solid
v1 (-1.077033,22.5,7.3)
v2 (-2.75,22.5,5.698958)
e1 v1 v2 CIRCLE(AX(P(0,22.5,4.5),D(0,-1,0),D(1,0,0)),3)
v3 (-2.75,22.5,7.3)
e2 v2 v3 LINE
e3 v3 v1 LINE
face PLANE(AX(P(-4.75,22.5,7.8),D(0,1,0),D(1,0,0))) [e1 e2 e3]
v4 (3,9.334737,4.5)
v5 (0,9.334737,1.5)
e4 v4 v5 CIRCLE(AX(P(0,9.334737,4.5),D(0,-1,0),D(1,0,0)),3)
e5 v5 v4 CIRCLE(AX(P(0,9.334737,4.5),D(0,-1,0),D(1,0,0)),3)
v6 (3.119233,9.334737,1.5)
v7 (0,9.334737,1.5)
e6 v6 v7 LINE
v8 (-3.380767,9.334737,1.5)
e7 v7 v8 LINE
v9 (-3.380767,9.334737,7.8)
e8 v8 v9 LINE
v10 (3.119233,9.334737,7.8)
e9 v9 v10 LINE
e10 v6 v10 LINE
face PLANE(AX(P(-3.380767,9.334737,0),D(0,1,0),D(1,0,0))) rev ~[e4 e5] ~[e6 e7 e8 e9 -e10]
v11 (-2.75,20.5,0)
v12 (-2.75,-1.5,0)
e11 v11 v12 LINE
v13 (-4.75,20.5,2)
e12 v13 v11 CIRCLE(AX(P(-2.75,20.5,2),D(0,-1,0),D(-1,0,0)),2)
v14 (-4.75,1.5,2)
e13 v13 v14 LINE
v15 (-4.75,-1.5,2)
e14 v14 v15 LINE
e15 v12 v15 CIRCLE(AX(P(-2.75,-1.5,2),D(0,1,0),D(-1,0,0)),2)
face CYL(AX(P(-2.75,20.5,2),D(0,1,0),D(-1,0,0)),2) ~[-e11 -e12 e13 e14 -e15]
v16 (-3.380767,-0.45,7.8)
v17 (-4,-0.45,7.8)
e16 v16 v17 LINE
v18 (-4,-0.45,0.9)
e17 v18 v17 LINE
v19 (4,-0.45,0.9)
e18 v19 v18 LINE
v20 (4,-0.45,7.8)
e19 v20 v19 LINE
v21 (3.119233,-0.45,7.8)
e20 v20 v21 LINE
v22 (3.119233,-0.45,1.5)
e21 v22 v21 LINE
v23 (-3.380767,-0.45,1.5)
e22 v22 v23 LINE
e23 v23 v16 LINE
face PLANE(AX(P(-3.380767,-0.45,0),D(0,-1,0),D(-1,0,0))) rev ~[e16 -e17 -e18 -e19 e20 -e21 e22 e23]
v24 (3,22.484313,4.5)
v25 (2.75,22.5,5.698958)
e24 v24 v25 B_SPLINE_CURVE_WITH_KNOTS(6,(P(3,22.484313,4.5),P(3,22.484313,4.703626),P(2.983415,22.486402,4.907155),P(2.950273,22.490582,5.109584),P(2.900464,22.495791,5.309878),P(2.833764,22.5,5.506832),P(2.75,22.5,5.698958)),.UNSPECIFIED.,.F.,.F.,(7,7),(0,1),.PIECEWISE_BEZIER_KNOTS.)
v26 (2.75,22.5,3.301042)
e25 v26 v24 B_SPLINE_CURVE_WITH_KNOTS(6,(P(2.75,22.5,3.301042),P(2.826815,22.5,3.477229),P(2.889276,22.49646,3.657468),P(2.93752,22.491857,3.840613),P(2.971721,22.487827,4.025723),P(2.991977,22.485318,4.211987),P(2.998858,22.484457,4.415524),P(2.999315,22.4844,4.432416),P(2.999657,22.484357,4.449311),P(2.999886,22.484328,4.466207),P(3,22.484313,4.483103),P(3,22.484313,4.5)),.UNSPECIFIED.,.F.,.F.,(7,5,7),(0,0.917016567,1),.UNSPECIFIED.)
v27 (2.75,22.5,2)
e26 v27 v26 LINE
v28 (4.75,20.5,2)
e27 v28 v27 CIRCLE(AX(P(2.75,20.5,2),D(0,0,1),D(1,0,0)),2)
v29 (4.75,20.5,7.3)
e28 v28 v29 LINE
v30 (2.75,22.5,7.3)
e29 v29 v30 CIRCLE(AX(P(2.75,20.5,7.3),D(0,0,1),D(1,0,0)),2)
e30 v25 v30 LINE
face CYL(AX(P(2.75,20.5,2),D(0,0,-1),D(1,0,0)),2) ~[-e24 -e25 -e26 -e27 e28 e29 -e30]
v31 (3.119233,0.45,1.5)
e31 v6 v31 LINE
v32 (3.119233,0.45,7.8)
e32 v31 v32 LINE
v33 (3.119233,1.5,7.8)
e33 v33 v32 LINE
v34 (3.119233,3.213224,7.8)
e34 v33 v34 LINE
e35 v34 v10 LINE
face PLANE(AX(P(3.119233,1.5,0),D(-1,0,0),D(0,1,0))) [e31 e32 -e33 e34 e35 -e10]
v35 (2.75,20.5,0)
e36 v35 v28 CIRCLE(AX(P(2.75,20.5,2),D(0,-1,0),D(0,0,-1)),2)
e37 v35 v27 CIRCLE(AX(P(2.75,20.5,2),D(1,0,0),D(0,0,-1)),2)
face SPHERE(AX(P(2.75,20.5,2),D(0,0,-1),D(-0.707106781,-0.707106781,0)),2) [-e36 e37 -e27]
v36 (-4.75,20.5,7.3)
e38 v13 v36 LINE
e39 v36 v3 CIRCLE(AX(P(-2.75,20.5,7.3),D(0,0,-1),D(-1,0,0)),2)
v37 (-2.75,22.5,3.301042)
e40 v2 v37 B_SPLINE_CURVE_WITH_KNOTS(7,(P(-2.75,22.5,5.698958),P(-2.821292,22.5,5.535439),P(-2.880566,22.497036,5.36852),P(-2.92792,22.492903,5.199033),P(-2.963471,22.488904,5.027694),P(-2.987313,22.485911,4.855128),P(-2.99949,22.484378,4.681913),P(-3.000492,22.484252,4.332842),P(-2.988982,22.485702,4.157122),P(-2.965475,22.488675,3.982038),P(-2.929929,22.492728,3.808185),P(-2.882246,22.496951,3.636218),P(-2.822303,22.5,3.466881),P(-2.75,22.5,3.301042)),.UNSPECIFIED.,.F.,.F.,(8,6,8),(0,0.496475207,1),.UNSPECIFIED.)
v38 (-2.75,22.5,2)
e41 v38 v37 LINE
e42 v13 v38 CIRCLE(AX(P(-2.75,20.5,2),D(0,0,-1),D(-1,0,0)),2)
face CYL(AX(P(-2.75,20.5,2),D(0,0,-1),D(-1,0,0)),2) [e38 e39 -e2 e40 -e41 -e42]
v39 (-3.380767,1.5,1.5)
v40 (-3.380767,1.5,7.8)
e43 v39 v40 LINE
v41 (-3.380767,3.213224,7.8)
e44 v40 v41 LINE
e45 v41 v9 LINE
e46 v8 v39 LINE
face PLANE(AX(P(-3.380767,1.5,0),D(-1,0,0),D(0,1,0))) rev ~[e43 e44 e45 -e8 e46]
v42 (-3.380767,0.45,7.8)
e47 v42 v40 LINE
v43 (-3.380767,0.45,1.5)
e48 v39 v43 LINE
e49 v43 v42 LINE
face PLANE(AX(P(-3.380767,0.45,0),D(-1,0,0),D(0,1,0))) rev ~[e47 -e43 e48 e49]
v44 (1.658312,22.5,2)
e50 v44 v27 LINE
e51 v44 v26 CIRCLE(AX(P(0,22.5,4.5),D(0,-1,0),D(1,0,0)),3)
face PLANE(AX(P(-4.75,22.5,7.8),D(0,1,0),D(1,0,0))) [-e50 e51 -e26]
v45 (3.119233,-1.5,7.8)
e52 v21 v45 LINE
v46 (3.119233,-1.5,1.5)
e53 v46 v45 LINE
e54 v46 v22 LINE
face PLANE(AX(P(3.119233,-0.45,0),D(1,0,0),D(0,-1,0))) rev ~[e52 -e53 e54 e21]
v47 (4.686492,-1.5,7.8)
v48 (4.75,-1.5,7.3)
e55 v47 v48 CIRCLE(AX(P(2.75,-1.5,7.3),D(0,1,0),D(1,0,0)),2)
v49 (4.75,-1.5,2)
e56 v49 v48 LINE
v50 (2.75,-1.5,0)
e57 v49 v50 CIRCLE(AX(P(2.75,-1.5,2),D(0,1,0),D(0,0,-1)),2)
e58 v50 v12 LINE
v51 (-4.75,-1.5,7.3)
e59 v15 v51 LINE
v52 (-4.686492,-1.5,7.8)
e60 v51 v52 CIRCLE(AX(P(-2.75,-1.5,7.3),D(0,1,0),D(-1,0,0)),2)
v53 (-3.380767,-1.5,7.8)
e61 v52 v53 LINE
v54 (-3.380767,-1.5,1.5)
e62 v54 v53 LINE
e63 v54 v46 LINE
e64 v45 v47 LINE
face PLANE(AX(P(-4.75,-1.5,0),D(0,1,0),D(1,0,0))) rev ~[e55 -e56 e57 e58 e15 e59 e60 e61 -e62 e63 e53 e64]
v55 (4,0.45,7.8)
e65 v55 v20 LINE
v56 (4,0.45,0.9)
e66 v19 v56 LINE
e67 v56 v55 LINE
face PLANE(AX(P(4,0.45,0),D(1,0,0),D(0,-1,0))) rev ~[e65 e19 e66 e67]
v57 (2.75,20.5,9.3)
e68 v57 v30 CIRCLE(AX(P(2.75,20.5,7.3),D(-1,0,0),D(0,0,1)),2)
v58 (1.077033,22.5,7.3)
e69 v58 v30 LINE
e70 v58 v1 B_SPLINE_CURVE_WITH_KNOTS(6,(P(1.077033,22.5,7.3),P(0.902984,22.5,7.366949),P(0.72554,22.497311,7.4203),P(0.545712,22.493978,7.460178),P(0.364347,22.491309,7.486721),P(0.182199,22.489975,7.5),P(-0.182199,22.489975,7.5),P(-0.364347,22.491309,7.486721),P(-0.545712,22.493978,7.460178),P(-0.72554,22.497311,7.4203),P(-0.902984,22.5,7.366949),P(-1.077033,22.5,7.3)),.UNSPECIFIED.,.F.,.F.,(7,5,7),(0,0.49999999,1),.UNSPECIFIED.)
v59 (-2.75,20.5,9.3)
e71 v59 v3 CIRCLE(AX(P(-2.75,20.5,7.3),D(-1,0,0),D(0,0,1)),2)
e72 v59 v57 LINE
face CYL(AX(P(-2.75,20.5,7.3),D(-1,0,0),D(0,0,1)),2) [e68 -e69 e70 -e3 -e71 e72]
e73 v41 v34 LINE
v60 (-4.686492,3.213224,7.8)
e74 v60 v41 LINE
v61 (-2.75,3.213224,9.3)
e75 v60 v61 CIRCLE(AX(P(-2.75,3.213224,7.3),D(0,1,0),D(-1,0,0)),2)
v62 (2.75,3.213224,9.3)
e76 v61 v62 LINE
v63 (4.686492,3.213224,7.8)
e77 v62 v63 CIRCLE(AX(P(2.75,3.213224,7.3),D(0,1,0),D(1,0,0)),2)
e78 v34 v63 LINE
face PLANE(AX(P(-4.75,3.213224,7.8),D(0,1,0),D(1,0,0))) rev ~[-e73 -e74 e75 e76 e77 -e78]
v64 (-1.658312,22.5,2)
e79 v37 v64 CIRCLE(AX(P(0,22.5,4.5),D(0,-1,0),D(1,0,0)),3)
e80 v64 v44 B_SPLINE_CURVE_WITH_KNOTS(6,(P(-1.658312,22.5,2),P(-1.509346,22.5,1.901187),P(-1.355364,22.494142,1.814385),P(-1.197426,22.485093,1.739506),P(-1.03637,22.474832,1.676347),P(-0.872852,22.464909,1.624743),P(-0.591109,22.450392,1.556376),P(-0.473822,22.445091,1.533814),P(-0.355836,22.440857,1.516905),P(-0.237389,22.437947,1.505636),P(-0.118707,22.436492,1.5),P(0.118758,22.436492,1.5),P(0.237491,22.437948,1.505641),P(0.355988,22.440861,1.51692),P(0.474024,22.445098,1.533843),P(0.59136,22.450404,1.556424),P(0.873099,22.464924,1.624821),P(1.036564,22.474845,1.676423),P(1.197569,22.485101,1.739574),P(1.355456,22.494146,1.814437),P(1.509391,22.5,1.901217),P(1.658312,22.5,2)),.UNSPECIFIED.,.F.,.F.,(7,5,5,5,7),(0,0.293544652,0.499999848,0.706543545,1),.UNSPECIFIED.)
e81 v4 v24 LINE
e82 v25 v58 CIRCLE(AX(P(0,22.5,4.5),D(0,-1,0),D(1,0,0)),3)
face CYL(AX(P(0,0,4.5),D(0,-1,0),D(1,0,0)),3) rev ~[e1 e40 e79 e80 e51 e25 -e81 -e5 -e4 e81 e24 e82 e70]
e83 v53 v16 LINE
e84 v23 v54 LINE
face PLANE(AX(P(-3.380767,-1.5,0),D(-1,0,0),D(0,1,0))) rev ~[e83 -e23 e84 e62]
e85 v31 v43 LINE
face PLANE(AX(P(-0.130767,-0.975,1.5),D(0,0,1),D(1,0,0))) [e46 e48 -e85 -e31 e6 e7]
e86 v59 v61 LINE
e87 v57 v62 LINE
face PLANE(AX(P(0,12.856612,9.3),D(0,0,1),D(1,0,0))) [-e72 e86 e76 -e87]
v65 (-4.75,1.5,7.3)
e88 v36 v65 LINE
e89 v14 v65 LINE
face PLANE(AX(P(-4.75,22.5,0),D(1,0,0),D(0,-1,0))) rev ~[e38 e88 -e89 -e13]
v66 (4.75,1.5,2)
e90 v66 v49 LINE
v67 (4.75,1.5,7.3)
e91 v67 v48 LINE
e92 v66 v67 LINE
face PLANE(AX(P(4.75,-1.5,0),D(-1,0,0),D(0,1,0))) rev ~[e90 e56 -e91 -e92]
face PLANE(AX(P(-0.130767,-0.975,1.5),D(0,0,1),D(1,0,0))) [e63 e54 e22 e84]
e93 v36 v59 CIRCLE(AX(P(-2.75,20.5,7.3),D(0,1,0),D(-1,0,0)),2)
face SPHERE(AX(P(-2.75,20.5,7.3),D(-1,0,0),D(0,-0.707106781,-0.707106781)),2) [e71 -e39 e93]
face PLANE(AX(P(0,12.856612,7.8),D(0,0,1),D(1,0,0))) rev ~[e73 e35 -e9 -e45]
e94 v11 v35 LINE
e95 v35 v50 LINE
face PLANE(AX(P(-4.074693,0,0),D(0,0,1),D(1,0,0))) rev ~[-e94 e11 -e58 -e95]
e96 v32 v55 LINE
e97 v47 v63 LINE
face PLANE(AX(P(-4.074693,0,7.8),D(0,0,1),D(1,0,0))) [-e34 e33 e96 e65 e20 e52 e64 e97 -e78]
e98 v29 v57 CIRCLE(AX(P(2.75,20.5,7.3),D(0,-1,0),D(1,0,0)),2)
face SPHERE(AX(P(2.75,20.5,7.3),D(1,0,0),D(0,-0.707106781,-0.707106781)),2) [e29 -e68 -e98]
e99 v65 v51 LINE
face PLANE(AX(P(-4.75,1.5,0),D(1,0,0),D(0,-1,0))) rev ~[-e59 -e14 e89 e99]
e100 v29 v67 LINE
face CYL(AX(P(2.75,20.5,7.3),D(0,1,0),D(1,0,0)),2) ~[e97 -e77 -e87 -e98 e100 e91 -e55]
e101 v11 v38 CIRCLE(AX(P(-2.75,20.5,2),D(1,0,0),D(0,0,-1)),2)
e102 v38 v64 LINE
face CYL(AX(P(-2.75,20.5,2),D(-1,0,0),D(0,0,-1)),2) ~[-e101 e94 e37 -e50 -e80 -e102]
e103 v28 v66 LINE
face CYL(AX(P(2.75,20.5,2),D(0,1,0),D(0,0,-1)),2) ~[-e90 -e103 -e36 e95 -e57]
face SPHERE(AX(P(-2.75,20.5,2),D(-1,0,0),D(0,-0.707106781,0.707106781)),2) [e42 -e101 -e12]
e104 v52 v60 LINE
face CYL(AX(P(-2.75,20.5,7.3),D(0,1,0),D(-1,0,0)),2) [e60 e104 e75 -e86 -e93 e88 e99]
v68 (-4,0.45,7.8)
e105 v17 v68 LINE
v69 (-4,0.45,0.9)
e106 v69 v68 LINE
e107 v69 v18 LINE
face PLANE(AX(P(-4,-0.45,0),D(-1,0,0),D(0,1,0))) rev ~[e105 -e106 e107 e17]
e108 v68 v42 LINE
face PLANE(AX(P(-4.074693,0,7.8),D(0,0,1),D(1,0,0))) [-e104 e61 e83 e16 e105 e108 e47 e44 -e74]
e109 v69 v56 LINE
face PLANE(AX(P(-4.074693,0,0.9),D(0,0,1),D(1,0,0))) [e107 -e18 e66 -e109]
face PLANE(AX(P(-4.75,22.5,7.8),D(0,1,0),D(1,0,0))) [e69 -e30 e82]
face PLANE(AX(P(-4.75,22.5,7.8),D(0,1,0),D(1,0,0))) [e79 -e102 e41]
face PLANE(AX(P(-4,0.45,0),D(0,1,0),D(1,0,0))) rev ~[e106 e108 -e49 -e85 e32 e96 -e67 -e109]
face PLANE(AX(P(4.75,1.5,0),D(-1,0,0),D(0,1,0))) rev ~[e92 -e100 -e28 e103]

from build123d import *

# Parameters (mm, degrees)
F0_W         = 1.3692331631
F0_H         = 7.834737435
F0_W_2       = 6.5
F0_H_2       = 0.9
F0_W_3       = 0.6192331631
F0_H_3       = 1.05
F0_H_4       = 13.165262565
F0_W_4       = 0.8807668369
F0_W_5       = 1.6307668369
F1_DEPTH     = 0.9
F2_DEPTH     = 1.5
F3_DEPTH     = 7.8
F5_W         = 9.5
F5_H         = 19.2867757659
F6_DEPTH     = 1.5
F7_R         = 3
F8_DEPTH     = 22.501
F9_T1_DEPTH  = 5.3
F9_T3_DEPTH  = 5.5
F9_T5_DEPTH  = 22.2867757659
F9_T7_DEPTH  = 27
F9_S11_W     = 2
F9_S11_H     = 2
F9_T12_DEPTH = 2
F9_S17_W     = 2
F9_S17_H     = 2
F9_T18_DEPTH = 2
F9_S23_W     = 2
F9_S23_H     = 2
F9_T24_DEPTH = 2
F9_S29_W     = 2
F9_S29_H     = 2
F9_T30_DEPTH = 2


# Not quite as in the source:
# - a fillet or chamfer that OpenCascade refuses, or shapes differently, is made with other operations: its cross-section is extruded or revolved along the edge and cut away or added
# - a feature names something its author has since deleted; it is built from what else it names


with BuildPart() as f1:
    # F0 (on Top) → F1 (new body)
    with BuildSketch(Plane.XY):
        Polygon((-4.75, 1.5), (-4.75, -1.5), (-3.3807668369, -1.5), (-3.3807668369, -0.45), (-4, -0.45), (-4, 0.45), (-3.3807668369, 0.45), (-3.3807668369, 1.5), align=None)
        Polygon((-3.3807668369, -0.45), (-3.3807668369, -1.5), (-3.1192331631, -1.5), (3.1192331631, -1.5), (3.1192331631, -0.45), align=None)
        with Locations((-4.0653834185, 5.4173687175)):
            Rectangle(F0_W, F0_H)
        with Locations((-0.1307668369, 0)):
            Rectangle(F0_W_2, F0_H_2)
        with Locations((-3.6903834185, 0)):
            Rectangle(F0_W_3, F0_H_2)
        with Locations((-0.1307668369, 5.4173687175)):
            Rectangle(F0_W_2, F0_H)
        with Locations((-0.1307668369, 0.975)):
            Rectangle(F0_W_2, F0_H_3)
        with Locations((-4.0653834185, 15.9173687175)):
            Rectangle(F0_W, F0_H_4)
        Polygon((3.1192331631, -0.45), (3.1192331631, -1.5), (3.3807668369, -1.5), (4.75, -1.5), (4.75, 1.5), (3.1192331631, 1.5), (3.1192331631, 0.45), (4, 0.45), (4, -0.45), align=None)
        with Locations((3.5596165815, 0)):
            Rectangle(F0_W_4, F0_H_2)
        with Locations((3.9346165815, 5.4173687175)):
            Rectangle(F0_W_5, F0_H)
        with Locations((-0.1307668369, 15.9173687175)):
            Rectangle(F0_W_2, F0_H_4)
        with Locations((3.9346165815, 15.9173687175)):
            Rectangle(F0_W_5, F0_H_4)
    extrude(amount=F1_DEPTH)

    # F0 (on Top) → F2 (join)
    with BuildSketch(Plane.XY):
        Polygon((-3.3807668369, -0.45), (-3.3807668369, -1.5), (-3.1192331631, -1.5), (3.1192331631, -1.5), (3.1192331631, -0.45), align=None)
        Polygon((3.1192331631, -0.45), (3.1192331631, -1.5), (3.3807668369, -1.5), (4.75, -1.5), (4.75, 1.5), (3.1192331631, 1.5), (3.1192331631, 0.45), (4, 0.45), (4, -0.45), align=None)
        Polygon((-4.75, 1.5), (-4.75, -1.5), (-3.3807668369, -1.5), (-3.3807668369, -0.45), (-4, -0.45), (-4, 0.45), (-3.3807668369, 0.45), (-3.3807668369, 1.5), align=None)
        with Locations((-0.1307668369, 0.975)):
            Rectangle(F0_W_2, F0_H_3)
        with Locations((-4.0653834185, 5.4173687175)):
            Rectangle(F0_W, F0_H)
        with Locations((3.9346165815, 5.4173687175)):
            Rectangle(F0_W_5, F0_H)
        with Locations((-0.1307668369, 5.4173687175)):
            Rectangle(F0_W_2, F0_H)
        with Locations((-4.0653834185, 15.9173687175)):
            Rectangle(F0_W, F0_H_4)
        with Locations((-0.1307668369, 15.9173687175)):
            Rectangle(F0_W_2, F0_H_4)
        with Locations((3.9346165815, 15.9173687175)):
            Rectangle(F0_W_5, F0_H_4)
    extrude(amount=F2_DEPTH)

    # F0 (on Top) → F3 (join)
    with BuildSketch(Plane.XY):
        Polygon((-4.75, 1.5), (-4.75, -1.5), (-3.3807668369, -1.5), (-3.3807668369, -0.45), (-4, -0.45), (-4, 0.45), (-3.3807668369, 0.45), (-3.3807668369, 1.5), align=None)
        Polygon((3.1192331631, -0.45), (3.1192331631, -1.5), (3.3807668369, -1.5), (4.75, -1.5), (4.75, 1.5), (3.1192331631, 1.5), (3.1192331631, 0.45), (4, 0.45), (4, -0.45), align=None)
        with Locations((-4.0653834185, 5.4173687175)):
            Rectangle(F0_W, F0_H)
        with Locations((3.9346165815, 5.4173687175)):
            Rectangle(F0_W_5, F0_H)
        with Locations((-4.0653834185, 15.9173687175)):
            Rectangle(F0_W, F0_H_4)
        with Locations((-0.1307668369, 15.9173687175)):
            Rectangle(F0_W_2, F0_H_4)
        with Locations((3.9346165815, 15.9173687175)):
            Rectangle(F0_W_5, F0_H_4)
    extrude(amount=F3_DEPTH)

    # F5 (on offset) → F6 (join)
    with BuildSketch(Plane.XY.offset(7.8)):
        with Locations((0, 12.856612117)):
            Rectangle(F5_W, F5_H)
    extrude(amount=F6_DEPTH)

    # F7 (on Front) → F8 (cut, through all)
    with BuildSketch(Plane.XZ):
        with Locations((0, 4.5)):
            Circle(F7_R)
    extrude(amount=-F8_DEPTH, mode=Mode.SUBTRACT)

    # F9: fillet of radius 2 on 8 edges, made by hand

    # F9_s2 → F9_t1 (cut)
    with BuildSketch(Plane.XY.offset(2)):
        with BuildLine():
            ThreePointArc((4.75, 20.5), (4.1642135624, 21.9142135624), (2.75, 22.5))
            Line((2.75, 22.5), (4.75, 22.5))
            Line((4.75, 22.5), (4.75, 20.5))
        make_face()
        with BuildLine():
            ThreePointArc((-4.75, 20.5), (-4.1642135624, 21.9142135624), (-2.75, 22.5))
            Line((-2.75, 22.5), (-4.75, 22.5))
            Line((-4.75, 22.5), (-4.75, 20.5))
        make_face()
    extrude(amount=F9_T1_DEPTH, mode=Mode.SUBTRACT)

    # F9_s4 → F9_t3 (cut)
    with BuildSketch(Plane.YZ.offset(-2.75)):
        with BuildLine():
            ThreePointArc((20.5, 9.3), (21.9142135624, 8.7142135624), (22.5, 7.3))
            Line((22.5, 7.3), (22.5, 9.3))
            Line((22.5, 9.3), (20.5, 9.3))
        make_face()
        with BuildLine():
            ThreePointArc((20.5, 0), (21.9142135624, 0.5857864376), (22.5, 2))
            Line((22.5, 2), (22.5, 0))
            Line((22.5, 0), (20.5, 0))
        make_face()
    extrude(amount=F9_T3_DEPTH, mode=Mode.SUBTRACT)

    # F9_s6 → F9_t5 (cut)
    with BuildSketch(Plane.XZ.offset(-20.5)):
        with BuildLine():
            ThreePointArc((4.75, 7.3), (4.1642135624, 8.7142135624), (2.75, 9.3))
            Line((2.75, 9.3), (4.75, 9.3))
            Line((4.75, 9.3), (4.75, 7.3))
        make_face()
        with BuildLine():
            ThreePointArc((-4.75, 7.3), (-4.1642135624, 8.7142135624), (-2.75, 9.3))
            Line((-2.75, 9.3), (-4.75, 9.3))
            Line((-4.75, 9.3), (-4.75, 7.3))
        make_face()
    extrude(amount=F9_T5_DEPTH, mode=Mode.SUBTRACT)

    # F9_s8 → F9_t7 (cut)
    with BuildSketch(Plane.XZ.offset(-20.5)):
        with BuildLine():
            ThreePointArc((2.75, 0), (4.1642135624, 0.5857864376), (4.75, 2))
            Line((4.75, 2), (4.75, 0))
            Line((4.75, 0), (2.75, 0))
        make_face()
        with BuildLine():
            ThreePointArc((-4.75, 2), (-4.1642135624, 0.5857864376), (-2.75, 0))
            Line((-2.75, 0), (-4.75, 0))
            Line((-4.75, 0), (-4.75, 2))
        make_face()
    extrude(amount=F9_T7_DEPTH, mode=Mode.SUBTRACT)


with BuildPart() as f9_tool10:
    # F9_s11 → F9_t12 (new body)
    with BuildSketch(Plane.YZ.offset(2.75)):
        with Locations((21.5, 8.3)):
            Rectangle(F9_S11_W, F9_S11_H)
    extrude(amount=F9_T12_DEPTH)

    # F9_s13 → F9_t14 (revolve, cut)
    with BuildSketch(Plane(origin=(2.75, 20.5, 7.3), x_dir=(0, -0.7071067812, -0.7071067812), z_dir=(0, -0.7071067812, 0.7071067812))):
        with BuildLine():
            ThreePointArc((0, -2), (2, 0), (0, 2))
            Line((0, 2), (0, -2))
        make_face()
    revolve(axis=Axis((2.75, 20.5, 7.3), (1, 0, 0)), mode=Mode.SUBTRACT)


with BuildPart() as f1_1:
    add(f1.part)

    # F9_t9: cut F9_tool10
    add(f9_tool10.part, mode=Mode.SUBTRACT)


with BuildPart() as f9_tool16:
    # F9_s17 → F9_t18 (new body)
    with BuildSketch(Plane.XY.offset(2)):
        with Locations((3.75, 21.5)):
            Rectangle(F9_S17_W, F9_S17_H)
    extrude(amount=-F9_T18_DEPTH)

    # F9_s19 → F9_t20 (revolve, cut)
    with BuildSketch(Plane(origin=(2.75, 20.5, 2), x_dir=(-0.7071067812, -0.7071067812, 0), z_dir=(0.7071067812, -0.7071067812, 0))):
        with BuildLine():
            ThreePointArc((0, -2), (2, 0), (0, 2))
            Line((0, 2), (0, -2))
        make_face()
    revolve(axis=Axis((2.75, 20.5, 2), (0, 0, -1)), mode=Mode.SUBTRACT)


with BuildPart() as f1_2:
    add(f1_1.part)

    # F9_t15: cut F9_tool16
    add(f9_tool16.part, mode=Mode.SUBTRACT)


with BuildPart() as f9_tool22:
    # F9_s23 → F9_t24 (new body)
    with BuildSketch(Plane.YZ.offset(-2.75)):
        with Locations((21.5, 8.3)):
            Rectangle(F9_S23_W, F9_S23_H)
    extrude(amount=-F9_T24_DEPTH)

    # F9_s25 → F9_t26 (revolve, cut)
    with BuildSketch(Plane(origin=(-2.75, 20.5, 7.3), x_dir=(0, -0.7071067812, -0.7071067812), z_dir=(0, 0.7071067812, -0.7071067812))):
        with BuildLine():
            ThreePointArc((0, -2), (2, 0), (0, 2))
            Line((0, 2), (0, -2))
        make_face()
    revolve(axis=Axis((-2.75, 20.5, 7.3), (-1, 0, 0)), mode=Mode.SUBTRACT)


with BuildPart() as f1_3:
    add(f1_2.part)

    # F9_t21: cut F9_tool22
    add(f9_tool22.part, mode=Mode.SUBTRACT)


with BuildPart() as f9_tool28:
    # F9_s29 → F9_t30 (new body)
    with BuildSketch(Plane.YZ.offset(-2.75)):
        with Locations((21.5, 1)):
            Rectangle(F9_S29_W, F9_S29_H)
    extrude(amount=-F9_T30_DEPTH)

    # F9_s31 → F9_t32 (revolve, cut)
    with BuildSketch(Plane(origin=(-2.75, 20.5, 2), x_dir=(0, -0.7071067812, 0.7071067812), z_dir=(0, -0.7071067812, -0.7071067812))):
        with BuildLine():
            ThreePointArc((0, -2), (2, 0), (0, 2))
            Line((0, 2), (0, -2))
        make_face()
    revolve(axis=Axis((-2.75, 20.5, 2), (-1, 0, 0)), mode=Mode.SUBTRACT)


with BuildPart() as f1_4:
    add(f1_3.part)

    # F9_t27: cut F9_tool28
    add(f9_tool28.part, mode=Mode.SUBTRACT)


solid = f1_4.part
